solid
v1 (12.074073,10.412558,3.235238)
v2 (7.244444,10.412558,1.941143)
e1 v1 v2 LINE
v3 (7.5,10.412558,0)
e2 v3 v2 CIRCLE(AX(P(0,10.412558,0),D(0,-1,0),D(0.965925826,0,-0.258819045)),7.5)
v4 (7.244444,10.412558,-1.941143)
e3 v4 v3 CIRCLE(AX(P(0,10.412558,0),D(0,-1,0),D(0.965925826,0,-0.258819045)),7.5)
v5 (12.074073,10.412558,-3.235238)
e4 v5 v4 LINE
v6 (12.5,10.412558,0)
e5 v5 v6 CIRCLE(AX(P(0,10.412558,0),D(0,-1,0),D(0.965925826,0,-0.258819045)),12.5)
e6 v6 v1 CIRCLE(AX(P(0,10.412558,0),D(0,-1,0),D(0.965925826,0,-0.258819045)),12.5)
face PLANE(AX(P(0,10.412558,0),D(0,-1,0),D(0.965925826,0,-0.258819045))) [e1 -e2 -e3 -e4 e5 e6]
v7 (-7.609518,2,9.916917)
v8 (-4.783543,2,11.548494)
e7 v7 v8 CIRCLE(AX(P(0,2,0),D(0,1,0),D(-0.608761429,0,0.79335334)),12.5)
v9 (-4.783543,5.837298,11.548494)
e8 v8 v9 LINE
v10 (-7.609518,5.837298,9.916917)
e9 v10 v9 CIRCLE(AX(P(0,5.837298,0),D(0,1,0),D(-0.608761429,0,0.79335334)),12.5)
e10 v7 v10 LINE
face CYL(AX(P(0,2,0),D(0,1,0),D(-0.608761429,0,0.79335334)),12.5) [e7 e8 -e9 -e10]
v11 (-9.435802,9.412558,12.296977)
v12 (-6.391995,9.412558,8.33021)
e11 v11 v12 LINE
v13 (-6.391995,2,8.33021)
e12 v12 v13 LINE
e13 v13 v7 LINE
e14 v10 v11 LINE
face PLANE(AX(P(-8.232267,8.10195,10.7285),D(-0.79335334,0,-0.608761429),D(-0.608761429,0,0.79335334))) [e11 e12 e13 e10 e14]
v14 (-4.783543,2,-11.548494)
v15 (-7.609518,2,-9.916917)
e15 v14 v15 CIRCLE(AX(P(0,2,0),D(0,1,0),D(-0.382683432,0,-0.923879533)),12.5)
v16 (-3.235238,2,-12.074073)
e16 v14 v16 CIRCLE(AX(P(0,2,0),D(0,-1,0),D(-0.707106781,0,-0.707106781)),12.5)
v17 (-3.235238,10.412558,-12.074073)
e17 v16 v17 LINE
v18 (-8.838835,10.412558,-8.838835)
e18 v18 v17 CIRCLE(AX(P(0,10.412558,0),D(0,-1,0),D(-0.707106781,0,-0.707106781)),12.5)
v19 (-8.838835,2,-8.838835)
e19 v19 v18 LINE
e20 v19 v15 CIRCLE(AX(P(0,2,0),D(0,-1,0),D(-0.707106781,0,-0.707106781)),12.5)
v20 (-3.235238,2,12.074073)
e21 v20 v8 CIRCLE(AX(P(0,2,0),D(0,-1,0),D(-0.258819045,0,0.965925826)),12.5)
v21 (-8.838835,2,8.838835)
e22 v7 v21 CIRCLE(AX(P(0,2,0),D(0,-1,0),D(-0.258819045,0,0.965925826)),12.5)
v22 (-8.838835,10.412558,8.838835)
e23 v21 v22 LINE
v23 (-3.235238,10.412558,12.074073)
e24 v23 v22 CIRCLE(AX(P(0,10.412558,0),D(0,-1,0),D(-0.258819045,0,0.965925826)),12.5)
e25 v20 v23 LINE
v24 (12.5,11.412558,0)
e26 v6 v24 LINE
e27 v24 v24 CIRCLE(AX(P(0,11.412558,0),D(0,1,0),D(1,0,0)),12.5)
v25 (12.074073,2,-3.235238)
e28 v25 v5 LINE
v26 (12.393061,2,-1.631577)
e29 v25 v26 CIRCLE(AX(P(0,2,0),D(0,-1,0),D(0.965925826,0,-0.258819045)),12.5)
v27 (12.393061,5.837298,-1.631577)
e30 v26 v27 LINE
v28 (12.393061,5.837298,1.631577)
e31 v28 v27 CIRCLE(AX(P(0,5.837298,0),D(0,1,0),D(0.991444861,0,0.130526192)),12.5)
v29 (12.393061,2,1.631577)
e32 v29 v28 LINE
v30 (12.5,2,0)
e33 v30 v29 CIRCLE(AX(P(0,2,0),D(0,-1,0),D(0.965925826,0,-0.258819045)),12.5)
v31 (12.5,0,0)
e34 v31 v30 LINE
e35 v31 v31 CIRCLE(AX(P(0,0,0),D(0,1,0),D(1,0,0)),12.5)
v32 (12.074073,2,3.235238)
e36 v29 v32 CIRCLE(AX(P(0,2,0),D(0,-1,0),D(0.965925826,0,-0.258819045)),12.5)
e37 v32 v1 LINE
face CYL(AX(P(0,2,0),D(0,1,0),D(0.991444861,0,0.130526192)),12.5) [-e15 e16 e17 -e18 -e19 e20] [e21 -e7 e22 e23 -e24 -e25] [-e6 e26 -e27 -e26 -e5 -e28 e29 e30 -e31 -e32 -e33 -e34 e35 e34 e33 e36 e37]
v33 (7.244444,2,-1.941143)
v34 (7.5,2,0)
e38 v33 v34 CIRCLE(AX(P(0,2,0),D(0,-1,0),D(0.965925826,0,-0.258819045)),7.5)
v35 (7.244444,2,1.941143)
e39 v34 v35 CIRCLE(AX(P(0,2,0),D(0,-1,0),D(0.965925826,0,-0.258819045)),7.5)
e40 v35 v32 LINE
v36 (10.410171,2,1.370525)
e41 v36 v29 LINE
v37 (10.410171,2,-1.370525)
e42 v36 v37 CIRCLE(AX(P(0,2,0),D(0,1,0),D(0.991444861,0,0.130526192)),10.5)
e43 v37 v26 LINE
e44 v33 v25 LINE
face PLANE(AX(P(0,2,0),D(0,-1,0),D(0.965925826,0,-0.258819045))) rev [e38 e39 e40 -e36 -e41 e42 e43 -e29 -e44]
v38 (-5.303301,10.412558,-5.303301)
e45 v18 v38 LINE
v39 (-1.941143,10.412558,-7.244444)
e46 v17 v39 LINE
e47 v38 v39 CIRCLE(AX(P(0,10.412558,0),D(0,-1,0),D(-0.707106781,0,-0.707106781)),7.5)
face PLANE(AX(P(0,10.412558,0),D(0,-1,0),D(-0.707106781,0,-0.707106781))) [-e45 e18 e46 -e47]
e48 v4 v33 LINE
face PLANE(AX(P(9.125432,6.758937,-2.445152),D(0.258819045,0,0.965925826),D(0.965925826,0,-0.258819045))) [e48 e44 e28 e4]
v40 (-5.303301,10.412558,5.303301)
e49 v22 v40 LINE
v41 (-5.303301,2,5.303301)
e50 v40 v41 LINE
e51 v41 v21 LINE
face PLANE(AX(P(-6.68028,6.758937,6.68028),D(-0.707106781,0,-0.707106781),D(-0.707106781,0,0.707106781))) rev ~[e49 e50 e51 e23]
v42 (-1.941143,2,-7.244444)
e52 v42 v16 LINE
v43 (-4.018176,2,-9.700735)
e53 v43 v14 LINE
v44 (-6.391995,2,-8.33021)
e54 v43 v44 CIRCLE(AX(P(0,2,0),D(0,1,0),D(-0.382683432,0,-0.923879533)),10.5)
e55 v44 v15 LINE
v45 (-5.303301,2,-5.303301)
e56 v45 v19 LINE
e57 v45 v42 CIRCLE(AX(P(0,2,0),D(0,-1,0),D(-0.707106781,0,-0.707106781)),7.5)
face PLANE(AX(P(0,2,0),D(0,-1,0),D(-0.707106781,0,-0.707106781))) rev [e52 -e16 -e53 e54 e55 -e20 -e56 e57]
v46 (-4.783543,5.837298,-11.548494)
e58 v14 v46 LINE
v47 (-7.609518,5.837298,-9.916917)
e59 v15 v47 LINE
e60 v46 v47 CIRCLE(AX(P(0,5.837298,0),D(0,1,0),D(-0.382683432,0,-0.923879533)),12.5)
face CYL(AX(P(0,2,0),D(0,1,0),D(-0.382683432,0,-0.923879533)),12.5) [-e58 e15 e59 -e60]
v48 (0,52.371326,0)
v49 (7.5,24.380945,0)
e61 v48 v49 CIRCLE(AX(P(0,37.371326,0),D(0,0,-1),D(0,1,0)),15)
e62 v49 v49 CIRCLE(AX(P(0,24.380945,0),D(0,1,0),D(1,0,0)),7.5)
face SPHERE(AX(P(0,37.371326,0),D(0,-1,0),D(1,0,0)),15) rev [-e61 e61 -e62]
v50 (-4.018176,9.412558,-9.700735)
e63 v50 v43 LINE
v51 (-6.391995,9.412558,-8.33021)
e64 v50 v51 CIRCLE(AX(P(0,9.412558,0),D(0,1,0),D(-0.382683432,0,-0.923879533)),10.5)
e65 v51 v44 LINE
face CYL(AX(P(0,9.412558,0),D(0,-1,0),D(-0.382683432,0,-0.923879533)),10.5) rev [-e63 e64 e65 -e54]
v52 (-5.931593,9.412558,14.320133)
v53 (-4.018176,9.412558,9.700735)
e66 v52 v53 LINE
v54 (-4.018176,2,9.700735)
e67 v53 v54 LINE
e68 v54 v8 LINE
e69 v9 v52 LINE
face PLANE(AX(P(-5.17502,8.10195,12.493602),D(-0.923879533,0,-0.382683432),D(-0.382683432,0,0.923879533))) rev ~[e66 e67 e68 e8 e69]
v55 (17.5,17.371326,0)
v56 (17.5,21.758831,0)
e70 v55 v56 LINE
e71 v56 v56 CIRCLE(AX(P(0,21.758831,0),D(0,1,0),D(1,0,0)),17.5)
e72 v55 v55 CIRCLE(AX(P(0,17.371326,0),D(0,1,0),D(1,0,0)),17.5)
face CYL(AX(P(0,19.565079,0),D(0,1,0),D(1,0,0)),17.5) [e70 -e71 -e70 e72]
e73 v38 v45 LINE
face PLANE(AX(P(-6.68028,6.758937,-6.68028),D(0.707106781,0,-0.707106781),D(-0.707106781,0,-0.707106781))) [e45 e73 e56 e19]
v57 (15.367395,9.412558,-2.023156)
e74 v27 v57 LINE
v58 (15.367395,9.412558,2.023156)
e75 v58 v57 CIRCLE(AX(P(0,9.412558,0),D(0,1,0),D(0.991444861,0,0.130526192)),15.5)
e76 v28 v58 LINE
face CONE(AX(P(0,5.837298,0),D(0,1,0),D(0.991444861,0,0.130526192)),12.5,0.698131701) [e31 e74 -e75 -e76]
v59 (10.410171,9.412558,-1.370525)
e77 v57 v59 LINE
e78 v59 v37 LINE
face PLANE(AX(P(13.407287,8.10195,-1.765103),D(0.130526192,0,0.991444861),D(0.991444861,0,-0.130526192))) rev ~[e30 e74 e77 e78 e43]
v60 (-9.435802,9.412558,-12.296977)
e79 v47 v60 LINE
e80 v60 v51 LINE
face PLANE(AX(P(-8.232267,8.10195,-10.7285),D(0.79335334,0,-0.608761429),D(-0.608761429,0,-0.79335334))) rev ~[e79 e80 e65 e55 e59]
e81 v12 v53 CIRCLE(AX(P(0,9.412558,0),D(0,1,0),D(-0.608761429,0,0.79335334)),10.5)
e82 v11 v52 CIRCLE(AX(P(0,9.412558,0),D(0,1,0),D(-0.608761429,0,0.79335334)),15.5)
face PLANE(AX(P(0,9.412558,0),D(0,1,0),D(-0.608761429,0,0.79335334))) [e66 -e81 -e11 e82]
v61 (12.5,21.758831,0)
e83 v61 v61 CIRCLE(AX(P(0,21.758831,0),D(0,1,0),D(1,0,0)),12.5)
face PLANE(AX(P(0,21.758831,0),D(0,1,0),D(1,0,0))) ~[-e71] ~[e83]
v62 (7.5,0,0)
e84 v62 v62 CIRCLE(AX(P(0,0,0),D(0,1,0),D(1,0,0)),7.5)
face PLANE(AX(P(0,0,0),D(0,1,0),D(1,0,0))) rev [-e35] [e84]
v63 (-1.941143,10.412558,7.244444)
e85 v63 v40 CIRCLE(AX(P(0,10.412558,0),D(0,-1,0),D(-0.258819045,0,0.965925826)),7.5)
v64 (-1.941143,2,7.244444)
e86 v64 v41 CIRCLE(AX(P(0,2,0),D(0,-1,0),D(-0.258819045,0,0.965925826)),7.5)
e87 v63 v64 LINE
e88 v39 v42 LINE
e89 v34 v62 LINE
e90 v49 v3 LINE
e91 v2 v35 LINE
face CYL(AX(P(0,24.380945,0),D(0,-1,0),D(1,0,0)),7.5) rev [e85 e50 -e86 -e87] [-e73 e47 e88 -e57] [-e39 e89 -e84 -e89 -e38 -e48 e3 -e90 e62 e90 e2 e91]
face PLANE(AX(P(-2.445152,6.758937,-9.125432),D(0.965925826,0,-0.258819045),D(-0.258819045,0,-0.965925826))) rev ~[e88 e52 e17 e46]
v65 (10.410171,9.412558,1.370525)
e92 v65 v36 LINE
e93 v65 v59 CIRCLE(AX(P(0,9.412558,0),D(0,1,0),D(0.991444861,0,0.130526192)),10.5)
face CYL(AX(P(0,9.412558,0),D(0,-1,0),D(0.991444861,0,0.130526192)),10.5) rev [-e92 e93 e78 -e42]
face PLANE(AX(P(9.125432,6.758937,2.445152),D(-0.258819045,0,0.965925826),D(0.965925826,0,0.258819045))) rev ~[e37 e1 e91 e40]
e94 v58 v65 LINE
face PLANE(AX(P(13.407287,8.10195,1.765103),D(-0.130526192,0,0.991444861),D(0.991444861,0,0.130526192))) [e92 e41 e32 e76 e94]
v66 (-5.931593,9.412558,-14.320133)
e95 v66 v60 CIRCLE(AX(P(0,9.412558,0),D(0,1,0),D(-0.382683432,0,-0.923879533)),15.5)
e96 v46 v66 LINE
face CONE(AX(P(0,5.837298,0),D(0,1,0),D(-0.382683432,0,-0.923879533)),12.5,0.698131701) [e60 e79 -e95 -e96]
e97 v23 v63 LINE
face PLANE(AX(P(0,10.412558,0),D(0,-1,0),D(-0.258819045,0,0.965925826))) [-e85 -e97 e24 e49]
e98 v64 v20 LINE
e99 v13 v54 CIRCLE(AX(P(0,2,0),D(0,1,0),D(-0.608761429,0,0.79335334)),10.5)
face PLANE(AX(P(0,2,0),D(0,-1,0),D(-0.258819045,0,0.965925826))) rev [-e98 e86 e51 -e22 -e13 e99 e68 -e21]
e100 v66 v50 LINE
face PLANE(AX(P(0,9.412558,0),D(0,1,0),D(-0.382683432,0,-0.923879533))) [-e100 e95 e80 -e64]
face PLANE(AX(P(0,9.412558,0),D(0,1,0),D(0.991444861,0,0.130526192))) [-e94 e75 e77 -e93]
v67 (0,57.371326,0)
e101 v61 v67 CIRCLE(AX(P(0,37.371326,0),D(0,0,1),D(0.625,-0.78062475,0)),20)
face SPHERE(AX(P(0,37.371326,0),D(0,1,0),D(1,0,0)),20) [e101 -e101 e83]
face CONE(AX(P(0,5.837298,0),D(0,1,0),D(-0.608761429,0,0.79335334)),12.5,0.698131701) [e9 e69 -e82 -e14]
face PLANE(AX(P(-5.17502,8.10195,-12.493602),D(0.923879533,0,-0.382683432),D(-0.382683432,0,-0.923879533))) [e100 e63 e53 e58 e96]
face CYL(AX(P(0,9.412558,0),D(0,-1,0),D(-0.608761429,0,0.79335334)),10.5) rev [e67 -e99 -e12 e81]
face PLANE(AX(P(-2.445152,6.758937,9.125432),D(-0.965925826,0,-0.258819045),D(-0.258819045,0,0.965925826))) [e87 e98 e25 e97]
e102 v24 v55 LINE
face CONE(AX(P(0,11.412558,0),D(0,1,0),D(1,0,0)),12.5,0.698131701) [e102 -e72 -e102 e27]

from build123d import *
from build123d import SkipClean  # not in build123d's __all__

# Parameters (mm, degrees)
F0_W            = 5
F0_H            = 4.387505004
F3_ANGLE_BACK   = 15
F3_ANGLE        = 30
F3_COPIES_COUNT = 3
F4_ANGLE_BACK   = 7.5
F4_ANGLE        = 15
F4_COPIES_COUNT = 3


# Not quite as in the source:
# - a pattern or mirror of a feature is missing from the dataset's text; its kind, count and spacing are read off the source's solid


with BuildPart() as f1:
    # F0 (on Top) → F1 (revolve)
    with BuildSketch(Plane.XY):
        with BuildLine():
            ThreePointArc((12.5, 21.7588313682), (18.8712731409, 43.9951507913), (0, 57.3713263642))
            Line((0, 57.3713263642), (0, 52.3713263642))
            ThreePointArc((0, 52.3713263642), (14.4888873943, 41.2536120408), (7.5, 24.3809453075))
            Line((7.5, 24.3809453075), (7.5, 18.8308301465))
            ThreePointArc((7.5, 18.8308301465), (10.1065967461, 20.1128008707), (12.5, 21.7588313682))
        make_face()
        with BuildLine():
            Line((12.5, 17.3713263642), (12.5, 21.7588313682))
            ThreePointArc((12.5, 21.7588313682), (10.1065967461, 20.1128008707), (7.5, 18.8308301465))
            Line((7.5, 18.8308301465), (7.5, 0))
            Line((7.5, 0), (12.5, 0))
            Line((12.5, 0), (12.5, 11.4125584013))
            Line((12.5, 11.4125584013), (12.5, 17.3713263642))
        make_face()
        with Locations((15, 19.5650788662)):
            Rectangle(F0_W, F0_H)
        Polygon((17.5, 17.3713263642), (12.5, 17.3713263642), (12.5, 11.4125584013), align=None)
    revolve(axis=Axis((0, 26.1856631821, 0), (0, 1, 0)))

    # F2 (on Top) → F3 (revolve, cut)
    with BuildSketch(Plane.XY, mode=Mode.PRIVATE) as f3_sk:
        Polygon((7.5, 10.4125584013), (7.5, 2), (10.5, 2), (10.5, 9.4125584013), (12.5, 9.4125584013), (12.5, 10.4125584013), align=None)
        Polygon((10.5, 2), (12.5, 2), (12.5, 5.8372976235), (12.5, 9.4125584013), (10.5, 9.4125584013), align=None)
    f3 = revolve(f3_sk.sketch.rotate(Axis((0, 0, 0), (0, -1, 0)), -F3_ANGLE_BACK), axis=Axis((0, 0, 0), (0, -1, 0)), revolution_arc=F3_ANGLE, mode=Mode.SUBTRACT)

    # F3_copies: F3 ×3 about axis
    f3_copies_axis = Axis((0, 0, 0), (0, 1, 0))
    for i in range(1, F3_COPIES_COUNT):
        add(f3.rotate(f3_copies_axis, i * 360 / F3_COPIES_COUNT), clean=False, mode=Mode.SUBTRACT)

    # F2 (on Top) → F4 (revolve)
    with BuildSketch(Plane.XY, mode=Mode.PRIVATE) as f4_sk:
        Polygon((12.5, 9.4125584013), (12.5, 5.8372976235), (15.5, 9.4125584013), align=None)
        Polygon((10.5, 2), (12.5, 2), (12.5, 5.8372976235), (12.5, 9.4125584013), (10.5, 9.4125584013), align=None)
    f4 = revolve(f4_sk.sketch.rotate(Axis((0, 0, 0), (0, 1, 0)), -F4_ANGLE_BACK), axis=Axis((0, 0, 0), (0, 1, 0)), revolution_arc=F4_ANGLE)

    # F4_copies: F4 ×3 about axis
    f4_copies_axis = Axis((0, 0, 0), (0, 1, 0))
    with SkipClean():  # cleaning this boolean's faces spoils the solid; the shape is the same uncleaned
        for i in range(1, F4_COPIES_COUNT):
            add(f4.rotate(f4_copies_axis, i * 360 / F4_COPIES_COUNT), clean=False)


solid = f1.part
